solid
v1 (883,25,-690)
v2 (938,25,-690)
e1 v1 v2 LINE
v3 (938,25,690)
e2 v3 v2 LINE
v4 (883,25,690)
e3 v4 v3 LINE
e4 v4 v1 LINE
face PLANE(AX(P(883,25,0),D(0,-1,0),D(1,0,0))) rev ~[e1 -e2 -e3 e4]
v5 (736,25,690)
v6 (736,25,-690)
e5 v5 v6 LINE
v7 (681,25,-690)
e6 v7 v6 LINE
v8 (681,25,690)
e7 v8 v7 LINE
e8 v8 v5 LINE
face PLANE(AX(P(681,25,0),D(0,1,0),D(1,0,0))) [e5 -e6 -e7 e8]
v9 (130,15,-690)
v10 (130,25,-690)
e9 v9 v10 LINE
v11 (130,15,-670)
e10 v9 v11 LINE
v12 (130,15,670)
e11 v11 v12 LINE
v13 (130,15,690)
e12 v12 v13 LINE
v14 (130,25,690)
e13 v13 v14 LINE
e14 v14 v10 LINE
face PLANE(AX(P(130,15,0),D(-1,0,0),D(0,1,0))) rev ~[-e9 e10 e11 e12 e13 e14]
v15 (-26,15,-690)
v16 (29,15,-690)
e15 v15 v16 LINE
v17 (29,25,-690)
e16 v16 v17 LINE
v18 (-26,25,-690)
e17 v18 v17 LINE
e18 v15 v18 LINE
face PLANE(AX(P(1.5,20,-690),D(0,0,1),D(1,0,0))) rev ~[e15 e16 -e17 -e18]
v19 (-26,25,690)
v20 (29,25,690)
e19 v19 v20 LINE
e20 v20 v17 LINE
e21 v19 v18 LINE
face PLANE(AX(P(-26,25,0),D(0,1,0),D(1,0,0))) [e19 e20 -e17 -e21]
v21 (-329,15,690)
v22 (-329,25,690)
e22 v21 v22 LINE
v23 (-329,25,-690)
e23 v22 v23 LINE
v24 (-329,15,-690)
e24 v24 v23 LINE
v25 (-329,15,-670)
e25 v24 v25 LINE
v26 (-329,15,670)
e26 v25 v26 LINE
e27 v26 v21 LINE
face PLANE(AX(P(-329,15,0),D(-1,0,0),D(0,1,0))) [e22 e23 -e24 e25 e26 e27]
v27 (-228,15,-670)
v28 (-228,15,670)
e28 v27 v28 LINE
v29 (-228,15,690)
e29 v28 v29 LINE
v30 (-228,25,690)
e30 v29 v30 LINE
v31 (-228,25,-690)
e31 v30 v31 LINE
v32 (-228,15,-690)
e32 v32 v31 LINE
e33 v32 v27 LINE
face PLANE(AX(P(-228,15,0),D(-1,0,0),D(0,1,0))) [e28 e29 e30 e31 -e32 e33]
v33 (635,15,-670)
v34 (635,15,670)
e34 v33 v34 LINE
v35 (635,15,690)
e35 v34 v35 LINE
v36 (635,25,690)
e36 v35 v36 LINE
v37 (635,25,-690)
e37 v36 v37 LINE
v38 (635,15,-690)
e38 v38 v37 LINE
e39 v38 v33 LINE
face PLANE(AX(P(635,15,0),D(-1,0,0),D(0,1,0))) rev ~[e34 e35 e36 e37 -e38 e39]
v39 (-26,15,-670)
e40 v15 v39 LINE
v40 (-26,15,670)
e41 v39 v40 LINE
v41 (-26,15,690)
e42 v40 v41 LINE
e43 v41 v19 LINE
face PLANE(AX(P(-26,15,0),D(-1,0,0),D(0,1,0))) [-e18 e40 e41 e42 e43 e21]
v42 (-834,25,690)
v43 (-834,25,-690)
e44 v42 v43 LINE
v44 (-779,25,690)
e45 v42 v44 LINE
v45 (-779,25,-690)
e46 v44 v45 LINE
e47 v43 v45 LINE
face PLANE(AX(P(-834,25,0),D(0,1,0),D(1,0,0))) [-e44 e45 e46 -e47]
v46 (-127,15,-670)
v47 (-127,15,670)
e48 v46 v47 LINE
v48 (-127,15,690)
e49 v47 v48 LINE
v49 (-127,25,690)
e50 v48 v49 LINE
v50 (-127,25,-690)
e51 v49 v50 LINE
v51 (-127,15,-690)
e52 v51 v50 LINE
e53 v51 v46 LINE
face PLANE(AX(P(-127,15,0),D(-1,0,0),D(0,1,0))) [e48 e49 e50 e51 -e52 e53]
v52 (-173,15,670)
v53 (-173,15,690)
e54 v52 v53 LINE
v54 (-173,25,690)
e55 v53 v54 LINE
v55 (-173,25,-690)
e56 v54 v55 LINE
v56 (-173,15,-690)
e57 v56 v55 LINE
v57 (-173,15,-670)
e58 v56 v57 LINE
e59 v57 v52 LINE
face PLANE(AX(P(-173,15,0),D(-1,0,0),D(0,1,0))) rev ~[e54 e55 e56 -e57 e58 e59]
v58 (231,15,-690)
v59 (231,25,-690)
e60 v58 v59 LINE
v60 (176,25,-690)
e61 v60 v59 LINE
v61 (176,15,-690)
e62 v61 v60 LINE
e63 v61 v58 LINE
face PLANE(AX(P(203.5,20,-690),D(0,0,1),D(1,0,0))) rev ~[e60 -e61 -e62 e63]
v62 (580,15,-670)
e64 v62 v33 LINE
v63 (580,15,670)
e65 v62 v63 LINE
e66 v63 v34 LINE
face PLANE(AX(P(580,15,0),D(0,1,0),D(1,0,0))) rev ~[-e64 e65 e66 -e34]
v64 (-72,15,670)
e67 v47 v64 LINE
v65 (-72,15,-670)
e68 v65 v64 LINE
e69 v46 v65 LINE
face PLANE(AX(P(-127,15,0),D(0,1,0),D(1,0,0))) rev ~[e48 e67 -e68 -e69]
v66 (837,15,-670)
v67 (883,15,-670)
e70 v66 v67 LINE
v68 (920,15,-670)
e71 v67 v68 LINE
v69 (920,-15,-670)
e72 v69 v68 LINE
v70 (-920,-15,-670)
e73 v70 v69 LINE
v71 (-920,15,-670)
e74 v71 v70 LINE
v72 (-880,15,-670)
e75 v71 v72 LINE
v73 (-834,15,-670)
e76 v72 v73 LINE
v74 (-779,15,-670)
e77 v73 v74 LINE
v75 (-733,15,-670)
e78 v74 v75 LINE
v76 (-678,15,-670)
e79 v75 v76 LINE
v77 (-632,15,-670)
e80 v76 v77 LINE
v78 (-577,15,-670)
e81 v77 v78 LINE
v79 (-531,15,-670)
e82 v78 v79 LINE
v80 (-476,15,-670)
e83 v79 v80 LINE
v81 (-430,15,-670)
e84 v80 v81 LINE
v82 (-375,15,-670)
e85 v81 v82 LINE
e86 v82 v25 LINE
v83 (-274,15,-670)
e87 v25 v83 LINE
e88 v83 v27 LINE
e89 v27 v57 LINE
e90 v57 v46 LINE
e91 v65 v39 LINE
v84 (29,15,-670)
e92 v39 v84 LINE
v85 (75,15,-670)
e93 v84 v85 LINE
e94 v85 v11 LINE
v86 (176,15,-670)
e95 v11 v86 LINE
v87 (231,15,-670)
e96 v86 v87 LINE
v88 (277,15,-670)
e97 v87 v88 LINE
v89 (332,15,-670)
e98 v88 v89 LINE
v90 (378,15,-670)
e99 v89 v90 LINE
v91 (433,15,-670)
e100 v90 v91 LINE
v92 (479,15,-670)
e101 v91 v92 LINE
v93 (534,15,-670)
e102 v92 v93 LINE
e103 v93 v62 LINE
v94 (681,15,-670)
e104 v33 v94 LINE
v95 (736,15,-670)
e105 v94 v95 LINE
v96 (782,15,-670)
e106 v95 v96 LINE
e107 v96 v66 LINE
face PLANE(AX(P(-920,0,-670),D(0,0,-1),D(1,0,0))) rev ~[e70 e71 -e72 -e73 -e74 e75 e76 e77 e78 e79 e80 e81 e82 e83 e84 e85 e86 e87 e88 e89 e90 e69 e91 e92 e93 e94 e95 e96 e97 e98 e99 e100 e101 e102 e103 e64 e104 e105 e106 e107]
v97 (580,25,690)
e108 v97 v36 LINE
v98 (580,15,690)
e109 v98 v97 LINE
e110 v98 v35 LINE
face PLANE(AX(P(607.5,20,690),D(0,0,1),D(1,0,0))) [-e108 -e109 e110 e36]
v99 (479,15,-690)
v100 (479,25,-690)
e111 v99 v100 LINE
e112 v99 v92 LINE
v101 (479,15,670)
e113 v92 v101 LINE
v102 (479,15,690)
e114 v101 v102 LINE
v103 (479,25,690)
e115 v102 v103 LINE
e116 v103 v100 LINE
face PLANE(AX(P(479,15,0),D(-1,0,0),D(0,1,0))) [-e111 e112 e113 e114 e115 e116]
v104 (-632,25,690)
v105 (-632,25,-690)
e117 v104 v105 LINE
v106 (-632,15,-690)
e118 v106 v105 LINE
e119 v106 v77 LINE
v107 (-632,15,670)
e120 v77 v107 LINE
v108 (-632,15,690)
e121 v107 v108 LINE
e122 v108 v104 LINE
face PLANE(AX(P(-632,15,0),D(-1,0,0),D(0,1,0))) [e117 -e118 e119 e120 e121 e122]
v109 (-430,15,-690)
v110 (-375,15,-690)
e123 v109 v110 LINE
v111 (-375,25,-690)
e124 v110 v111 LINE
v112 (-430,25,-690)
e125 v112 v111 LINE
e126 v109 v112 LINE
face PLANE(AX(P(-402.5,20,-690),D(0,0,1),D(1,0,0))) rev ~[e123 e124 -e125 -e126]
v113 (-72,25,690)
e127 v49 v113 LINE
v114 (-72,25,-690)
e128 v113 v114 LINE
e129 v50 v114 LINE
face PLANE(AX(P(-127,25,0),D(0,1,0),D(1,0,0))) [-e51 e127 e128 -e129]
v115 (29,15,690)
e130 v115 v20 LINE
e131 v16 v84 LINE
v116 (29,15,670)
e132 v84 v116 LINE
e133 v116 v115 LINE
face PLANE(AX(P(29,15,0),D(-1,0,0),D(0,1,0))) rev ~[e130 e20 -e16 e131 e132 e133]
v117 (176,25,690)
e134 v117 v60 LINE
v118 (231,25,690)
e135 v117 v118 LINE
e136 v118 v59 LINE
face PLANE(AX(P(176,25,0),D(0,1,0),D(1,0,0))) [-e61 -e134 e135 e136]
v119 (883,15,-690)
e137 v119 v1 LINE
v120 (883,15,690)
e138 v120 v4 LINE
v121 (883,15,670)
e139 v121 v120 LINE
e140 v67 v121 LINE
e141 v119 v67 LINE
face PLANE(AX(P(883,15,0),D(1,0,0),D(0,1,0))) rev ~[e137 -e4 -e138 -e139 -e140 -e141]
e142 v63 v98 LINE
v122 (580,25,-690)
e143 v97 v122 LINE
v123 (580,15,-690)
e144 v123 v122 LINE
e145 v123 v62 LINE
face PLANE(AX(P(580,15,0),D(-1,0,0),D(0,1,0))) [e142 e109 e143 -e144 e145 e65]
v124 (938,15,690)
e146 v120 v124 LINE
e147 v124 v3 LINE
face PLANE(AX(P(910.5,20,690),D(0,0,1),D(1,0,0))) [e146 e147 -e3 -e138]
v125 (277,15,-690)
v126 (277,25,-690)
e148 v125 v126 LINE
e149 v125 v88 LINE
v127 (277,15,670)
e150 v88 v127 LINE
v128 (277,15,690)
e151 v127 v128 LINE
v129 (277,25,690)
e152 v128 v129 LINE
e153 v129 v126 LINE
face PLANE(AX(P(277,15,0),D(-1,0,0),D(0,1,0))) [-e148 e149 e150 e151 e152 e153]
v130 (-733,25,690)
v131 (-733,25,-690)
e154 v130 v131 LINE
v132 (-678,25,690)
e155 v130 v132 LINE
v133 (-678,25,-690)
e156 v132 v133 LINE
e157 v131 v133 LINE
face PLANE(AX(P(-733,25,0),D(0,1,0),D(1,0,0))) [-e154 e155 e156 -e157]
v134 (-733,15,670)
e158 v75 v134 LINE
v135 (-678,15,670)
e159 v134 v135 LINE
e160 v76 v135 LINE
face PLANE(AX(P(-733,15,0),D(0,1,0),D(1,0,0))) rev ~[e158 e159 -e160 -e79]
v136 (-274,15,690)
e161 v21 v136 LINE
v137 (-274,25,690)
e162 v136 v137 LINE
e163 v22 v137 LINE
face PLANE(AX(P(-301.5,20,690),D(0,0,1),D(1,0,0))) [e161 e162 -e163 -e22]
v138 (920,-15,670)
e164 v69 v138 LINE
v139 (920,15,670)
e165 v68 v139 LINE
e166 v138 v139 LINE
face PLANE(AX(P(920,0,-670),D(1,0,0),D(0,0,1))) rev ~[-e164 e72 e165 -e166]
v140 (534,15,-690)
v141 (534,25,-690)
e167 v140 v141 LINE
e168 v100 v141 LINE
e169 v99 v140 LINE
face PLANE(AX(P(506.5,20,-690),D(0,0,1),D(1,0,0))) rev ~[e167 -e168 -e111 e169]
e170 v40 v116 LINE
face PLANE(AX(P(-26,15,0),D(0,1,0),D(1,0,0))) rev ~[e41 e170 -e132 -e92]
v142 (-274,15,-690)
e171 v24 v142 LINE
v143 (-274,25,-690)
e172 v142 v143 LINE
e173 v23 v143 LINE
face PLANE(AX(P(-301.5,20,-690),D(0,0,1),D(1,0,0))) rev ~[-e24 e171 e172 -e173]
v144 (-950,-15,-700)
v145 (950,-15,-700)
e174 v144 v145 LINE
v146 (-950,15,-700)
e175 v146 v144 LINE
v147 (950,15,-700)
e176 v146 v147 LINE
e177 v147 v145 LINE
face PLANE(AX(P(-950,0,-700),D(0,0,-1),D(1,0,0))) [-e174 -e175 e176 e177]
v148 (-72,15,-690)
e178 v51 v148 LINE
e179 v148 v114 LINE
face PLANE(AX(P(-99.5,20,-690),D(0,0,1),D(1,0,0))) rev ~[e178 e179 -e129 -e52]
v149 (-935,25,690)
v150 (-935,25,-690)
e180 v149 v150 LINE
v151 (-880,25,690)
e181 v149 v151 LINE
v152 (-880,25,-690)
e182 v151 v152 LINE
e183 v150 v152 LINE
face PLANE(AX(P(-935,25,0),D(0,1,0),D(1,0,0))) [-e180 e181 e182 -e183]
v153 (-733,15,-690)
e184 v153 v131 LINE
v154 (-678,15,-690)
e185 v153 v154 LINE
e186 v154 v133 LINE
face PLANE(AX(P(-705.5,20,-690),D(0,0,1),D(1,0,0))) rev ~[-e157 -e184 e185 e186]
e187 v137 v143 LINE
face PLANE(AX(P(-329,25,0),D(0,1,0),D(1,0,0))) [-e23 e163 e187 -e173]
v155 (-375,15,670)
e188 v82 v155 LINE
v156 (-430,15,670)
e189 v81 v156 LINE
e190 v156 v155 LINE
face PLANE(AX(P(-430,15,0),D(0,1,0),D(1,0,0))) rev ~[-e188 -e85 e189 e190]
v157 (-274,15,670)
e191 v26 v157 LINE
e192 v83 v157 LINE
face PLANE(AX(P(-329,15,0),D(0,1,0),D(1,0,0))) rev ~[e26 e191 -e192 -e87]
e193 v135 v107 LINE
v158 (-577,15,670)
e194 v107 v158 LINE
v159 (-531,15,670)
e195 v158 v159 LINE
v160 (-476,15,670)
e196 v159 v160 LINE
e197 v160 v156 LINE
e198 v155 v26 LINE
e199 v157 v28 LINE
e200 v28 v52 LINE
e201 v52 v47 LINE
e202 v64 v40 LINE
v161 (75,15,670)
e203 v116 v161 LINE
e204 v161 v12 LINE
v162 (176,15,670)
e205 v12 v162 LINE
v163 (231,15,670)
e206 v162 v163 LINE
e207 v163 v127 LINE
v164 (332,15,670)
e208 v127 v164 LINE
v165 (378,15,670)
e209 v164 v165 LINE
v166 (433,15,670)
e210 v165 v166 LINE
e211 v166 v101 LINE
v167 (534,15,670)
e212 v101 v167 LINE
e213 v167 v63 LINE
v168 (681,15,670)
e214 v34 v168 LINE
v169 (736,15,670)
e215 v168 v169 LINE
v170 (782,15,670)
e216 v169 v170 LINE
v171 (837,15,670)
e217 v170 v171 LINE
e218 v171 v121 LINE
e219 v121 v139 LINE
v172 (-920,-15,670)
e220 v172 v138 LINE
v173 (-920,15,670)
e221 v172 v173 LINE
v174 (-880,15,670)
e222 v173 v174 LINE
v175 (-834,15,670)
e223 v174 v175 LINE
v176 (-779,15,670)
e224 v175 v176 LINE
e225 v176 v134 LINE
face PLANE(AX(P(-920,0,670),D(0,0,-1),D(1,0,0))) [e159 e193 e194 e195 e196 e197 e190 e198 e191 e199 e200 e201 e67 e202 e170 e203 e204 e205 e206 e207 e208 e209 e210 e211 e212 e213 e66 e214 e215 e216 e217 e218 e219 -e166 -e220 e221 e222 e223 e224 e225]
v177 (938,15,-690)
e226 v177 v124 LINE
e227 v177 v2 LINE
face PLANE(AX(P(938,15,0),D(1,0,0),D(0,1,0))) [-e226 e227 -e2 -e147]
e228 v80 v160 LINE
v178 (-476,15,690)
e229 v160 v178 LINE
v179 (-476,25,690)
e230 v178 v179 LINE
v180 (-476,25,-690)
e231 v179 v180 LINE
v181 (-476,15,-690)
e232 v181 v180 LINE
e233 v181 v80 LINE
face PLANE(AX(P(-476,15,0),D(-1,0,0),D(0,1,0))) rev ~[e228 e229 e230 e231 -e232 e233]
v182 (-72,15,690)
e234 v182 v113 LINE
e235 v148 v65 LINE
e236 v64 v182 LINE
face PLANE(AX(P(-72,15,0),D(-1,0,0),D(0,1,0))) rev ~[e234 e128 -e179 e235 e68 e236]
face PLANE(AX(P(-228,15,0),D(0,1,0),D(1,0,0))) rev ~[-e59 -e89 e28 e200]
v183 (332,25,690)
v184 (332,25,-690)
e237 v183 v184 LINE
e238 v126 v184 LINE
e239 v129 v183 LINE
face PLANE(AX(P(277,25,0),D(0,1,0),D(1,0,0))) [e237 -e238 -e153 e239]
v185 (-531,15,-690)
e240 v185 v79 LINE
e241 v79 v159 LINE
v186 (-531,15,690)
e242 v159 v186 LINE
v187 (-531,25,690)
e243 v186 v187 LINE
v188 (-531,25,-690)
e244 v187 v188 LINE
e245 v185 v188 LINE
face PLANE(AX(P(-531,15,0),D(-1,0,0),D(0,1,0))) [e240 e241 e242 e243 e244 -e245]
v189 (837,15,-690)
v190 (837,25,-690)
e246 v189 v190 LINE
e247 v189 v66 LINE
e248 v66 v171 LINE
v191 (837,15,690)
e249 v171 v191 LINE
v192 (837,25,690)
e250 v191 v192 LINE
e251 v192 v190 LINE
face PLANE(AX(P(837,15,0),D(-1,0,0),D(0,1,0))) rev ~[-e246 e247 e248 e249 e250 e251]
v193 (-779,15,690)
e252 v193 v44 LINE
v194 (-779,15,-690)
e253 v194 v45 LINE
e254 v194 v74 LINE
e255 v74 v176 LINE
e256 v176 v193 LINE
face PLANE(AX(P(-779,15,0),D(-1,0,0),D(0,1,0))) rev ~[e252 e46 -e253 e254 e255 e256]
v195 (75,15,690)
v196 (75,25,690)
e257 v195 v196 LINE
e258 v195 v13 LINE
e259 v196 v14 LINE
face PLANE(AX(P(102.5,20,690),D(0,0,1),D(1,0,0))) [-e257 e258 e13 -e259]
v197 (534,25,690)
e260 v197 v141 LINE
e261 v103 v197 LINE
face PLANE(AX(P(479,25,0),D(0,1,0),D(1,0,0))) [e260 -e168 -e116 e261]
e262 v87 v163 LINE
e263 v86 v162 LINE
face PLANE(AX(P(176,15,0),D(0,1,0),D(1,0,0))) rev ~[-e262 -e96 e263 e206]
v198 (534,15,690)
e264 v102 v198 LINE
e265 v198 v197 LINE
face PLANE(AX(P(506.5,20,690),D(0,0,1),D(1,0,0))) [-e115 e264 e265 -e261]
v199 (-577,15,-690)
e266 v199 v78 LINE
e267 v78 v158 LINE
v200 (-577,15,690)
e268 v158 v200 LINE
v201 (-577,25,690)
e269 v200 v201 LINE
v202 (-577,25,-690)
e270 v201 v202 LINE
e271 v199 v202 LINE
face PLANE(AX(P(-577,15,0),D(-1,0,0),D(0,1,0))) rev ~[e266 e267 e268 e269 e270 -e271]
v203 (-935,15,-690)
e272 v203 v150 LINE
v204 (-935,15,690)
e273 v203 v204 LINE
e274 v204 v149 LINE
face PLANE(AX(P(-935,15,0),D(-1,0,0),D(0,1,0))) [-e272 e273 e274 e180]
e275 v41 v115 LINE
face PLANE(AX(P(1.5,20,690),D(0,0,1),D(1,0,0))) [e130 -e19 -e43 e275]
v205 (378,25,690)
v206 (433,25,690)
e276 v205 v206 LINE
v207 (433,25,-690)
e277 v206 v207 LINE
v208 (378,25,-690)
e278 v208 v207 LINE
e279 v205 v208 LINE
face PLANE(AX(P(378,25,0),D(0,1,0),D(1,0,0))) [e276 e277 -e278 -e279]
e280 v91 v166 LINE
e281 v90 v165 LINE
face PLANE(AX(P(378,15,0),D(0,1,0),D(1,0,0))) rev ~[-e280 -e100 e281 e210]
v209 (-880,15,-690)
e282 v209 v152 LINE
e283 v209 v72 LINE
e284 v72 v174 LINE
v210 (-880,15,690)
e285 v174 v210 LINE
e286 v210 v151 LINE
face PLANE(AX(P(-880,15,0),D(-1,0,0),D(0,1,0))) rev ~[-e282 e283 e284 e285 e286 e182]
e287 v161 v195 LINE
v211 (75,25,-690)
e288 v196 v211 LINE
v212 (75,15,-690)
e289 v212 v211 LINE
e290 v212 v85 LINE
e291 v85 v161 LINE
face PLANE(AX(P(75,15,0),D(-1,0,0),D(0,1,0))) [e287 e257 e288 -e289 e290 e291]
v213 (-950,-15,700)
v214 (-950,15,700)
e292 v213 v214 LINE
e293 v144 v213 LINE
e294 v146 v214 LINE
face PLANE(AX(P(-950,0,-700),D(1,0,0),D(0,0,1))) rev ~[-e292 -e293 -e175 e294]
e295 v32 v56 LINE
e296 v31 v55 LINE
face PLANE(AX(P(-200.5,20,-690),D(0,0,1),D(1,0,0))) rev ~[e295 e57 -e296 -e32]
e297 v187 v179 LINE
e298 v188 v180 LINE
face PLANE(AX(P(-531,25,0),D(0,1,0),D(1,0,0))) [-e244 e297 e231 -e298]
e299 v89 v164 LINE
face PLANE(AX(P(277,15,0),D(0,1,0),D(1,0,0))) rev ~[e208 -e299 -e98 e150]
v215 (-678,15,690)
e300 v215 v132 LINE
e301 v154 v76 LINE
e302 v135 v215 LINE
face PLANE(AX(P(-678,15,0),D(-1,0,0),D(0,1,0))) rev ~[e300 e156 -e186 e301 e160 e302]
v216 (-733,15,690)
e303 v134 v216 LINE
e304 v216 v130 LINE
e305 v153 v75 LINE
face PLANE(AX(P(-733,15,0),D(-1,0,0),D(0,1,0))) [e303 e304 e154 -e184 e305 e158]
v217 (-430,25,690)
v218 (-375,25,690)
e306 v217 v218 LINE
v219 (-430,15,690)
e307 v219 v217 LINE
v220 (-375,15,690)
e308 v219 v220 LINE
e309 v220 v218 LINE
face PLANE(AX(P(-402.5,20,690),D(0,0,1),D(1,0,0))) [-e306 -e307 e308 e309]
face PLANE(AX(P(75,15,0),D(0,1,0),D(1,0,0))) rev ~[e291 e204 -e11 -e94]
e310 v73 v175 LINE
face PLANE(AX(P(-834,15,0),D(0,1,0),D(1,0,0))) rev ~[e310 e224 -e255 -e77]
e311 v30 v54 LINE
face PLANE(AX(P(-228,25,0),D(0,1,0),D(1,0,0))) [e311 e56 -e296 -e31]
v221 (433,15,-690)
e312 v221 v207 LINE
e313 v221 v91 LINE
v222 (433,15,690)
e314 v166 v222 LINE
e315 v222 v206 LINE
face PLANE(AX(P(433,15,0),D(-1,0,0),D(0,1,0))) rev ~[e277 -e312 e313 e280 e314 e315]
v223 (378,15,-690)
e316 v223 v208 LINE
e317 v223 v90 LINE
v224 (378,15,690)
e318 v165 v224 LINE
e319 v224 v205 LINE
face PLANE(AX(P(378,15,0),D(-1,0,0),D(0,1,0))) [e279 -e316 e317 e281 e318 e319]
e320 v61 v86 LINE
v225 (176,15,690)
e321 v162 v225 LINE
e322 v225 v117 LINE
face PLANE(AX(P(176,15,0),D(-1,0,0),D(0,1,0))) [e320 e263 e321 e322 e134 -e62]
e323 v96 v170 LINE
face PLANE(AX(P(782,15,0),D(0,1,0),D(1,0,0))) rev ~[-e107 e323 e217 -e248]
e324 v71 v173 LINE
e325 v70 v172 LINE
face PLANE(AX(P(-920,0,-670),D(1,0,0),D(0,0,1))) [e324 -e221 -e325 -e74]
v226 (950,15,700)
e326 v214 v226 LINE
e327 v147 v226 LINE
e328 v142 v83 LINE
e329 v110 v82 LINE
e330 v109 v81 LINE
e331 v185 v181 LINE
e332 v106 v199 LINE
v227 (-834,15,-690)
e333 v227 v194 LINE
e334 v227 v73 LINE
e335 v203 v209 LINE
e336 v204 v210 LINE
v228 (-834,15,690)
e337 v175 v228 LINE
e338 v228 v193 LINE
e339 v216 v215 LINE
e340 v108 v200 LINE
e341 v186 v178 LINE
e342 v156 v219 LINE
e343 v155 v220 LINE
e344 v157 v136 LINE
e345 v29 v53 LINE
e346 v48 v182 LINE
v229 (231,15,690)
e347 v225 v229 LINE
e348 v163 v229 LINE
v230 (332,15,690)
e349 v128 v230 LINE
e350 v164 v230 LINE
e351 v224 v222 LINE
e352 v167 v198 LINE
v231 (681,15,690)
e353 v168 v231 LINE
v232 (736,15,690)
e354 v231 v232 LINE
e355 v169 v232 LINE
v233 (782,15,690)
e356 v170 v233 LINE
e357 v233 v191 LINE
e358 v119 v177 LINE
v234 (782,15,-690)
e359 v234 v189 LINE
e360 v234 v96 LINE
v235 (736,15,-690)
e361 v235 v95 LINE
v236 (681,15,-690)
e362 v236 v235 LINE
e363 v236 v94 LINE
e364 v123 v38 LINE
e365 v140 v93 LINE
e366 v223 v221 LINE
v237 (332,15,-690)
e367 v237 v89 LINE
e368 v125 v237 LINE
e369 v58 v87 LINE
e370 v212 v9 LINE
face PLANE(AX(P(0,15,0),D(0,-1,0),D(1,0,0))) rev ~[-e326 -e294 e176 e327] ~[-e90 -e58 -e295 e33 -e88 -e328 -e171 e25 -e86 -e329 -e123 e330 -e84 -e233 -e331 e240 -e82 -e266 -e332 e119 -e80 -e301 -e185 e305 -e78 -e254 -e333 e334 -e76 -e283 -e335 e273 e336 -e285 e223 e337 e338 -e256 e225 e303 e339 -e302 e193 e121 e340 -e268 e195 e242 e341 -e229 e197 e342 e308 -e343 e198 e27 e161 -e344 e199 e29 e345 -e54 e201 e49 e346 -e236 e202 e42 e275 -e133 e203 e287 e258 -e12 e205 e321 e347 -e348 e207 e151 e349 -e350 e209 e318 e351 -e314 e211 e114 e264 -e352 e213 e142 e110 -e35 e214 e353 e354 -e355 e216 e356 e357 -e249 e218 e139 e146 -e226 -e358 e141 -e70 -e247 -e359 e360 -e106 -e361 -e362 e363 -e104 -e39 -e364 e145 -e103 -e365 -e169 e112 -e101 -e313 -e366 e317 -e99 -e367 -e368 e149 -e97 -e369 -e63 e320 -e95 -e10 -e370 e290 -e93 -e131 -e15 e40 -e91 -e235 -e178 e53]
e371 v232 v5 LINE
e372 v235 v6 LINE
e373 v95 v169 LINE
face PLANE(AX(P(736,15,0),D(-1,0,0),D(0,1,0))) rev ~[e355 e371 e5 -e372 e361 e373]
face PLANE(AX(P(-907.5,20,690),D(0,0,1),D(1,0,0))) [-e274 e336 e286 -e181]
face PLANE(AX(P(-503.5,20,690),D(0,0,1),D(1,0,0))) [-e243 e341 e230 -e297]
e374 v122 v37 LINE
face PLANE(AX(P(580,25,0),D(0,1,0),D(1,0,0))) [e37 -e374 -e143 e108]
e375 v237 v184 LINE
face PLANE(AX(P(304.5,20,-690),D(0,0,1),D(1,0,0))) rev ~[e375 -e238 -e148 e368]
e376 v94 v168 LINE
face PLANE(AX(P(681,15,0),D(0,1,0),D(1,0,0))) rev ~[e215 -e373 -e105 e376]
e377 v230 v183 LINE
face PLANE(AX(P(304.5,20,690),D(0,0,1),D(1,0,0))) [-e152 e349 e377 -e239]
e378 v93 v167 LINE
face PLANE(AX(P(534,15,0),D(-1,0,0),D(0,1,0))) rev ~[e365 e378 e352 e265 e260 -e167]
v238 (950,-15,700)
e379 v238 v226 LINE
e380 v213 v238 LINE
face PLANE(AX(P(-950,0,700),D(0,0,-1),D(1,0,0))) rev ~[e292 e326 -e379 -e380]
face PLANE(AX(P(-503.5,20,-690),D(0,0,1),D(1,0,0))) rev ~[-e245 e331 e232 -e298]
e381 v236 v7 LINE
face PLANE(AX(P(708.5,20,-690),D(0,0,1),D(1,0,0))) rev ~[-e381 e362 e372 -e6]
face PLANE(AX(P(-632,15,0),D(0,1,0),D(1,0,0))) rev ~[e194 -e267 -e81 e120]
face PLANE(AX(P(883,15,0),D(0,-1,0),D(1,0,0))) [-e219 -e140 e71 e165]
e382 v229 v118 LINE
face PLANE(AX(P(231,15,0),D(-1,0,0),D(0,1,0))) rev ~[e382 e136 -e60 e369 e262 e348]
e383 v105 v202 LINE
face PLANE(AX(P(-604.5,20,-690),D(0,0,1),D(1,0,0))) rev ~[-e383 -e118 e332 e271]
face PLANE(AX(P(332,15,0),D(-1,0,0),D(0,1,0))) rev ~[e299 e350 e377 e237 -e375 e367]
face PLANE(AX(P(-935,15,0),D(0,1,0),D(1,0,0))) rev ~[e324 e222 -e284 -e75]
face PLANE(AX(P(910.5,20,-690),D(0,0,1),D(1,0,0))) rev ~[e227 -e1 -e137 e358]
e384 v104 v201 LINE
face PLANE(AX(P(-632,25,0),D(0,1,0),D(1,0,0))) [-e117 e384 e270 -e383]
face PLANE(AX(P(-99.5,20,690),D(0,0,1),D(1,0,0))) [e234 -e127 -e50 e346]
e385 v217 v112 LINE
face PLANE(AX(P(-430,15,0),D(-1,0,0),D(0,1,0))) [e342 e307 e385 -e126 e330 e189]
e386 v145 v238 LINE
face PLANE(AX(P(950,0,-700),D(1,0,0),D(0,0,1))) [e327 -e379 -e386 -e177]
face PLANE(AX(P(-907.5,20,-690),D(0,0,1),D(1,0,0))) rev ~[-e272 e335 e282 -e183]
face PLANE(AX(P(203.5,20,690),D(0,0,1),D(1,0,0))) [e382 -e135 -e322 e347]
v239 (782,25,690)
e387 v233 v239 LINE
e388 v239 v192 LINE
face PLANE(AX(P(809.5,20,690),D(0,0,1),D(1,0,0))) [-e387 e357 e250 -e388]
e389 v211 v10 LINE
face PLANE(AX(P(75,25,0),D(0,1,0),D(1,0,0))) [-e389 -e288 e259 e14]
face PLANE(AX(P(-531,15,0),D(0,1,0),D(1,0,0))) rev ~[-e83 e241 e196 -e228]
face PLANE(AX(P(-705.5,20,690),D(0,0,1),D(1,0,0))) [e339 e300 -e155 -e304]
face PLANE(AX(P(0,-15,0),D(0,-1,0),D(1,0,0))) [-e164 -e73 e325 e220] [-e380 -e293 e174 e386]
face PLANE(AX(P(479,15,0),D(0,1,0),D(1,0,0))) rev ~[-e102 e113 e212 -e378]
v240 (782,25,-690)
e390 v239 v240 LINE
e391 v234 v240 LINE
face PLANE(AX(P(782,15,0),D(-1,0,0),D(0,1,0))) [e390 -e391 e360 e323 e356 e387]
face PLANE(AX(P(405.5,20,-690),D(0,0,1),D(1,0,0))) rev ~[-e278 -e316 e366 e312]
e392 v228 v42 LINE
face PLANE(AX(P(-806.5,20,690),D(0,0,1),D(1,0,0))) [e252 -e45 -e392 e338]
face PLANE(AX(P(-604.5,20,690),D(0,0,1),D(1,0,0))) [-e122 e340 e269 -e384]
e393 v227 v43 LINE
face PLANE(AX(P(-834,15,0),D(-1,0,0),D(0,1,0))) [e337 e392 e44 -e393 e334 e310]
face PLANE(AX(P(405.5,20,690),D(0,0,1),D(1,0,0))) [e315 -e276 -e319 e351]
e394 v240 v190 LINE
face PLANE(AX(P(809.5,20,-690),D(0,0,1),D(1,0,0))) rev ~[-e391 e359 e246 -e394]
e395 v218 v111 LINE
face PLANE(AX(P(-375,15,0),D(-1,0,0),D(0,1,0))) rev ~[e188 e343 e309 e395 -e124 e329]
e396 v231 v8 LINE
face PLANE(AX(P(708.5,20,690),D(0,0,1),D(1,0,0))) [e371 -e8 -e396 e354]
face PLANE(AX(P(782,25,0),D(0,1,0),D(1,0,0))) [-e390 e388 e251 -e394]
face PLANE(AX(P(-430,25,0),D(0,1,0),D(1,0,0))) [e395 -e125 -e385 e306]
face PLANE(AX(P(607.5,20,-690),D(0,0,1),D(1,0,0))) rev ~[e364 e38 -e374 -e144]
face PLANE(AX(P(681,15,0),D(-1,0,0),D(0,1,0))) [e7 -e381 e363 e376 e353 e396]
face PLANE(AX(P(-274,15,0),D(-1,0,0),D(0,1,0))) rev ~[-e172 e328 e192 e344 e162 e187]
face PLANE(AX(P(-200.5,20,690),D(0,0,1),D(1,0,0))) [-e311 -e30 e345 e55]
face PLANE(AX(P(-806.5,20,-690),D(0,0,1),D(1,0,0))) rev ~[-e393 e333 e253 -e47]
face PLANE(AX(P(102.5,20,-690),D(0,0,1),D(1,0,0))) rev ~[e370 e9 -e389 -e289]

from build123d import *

# Parameters (mm, degrees)
F0_W     = 1900
F0_H     = 1400
F0_W_2   = 1840
F0_H_2   = 1340
F1_DEPTH = 15
F2_W     = 55
F2_H     = 10
F3_DEPTH = 690


# Not quite as in the source:
# - a feature names something its author has since deleted; it is built from what else it names


with BuildPart() as f1:
    # F0 (on Front) → F1 (new body, symmetric)
    with BuildSketch(Plane.XZ):
        Rectangle(F0_W, F0_H)
        Rectangle(F0_W_2, F0_H_2, mode=Mode.SUBTRACT)
    extrude(amount=F1_DEPTH, both=True)

    # F2 (on Top) → F3 (join, symmetric)
    with BuildSketch(Plane.XY):
        with Locations((-907.5, 20)):
            Rectangle(F2_W, F2_H)
        with Locations((-806.5, 20)):
            Rectangle(F2_W, F2_H)
        with Locations((-705.5, 20)):
            Rectangle(F2_W, F2_H)
        with Locations((-604.5, 20)):
            Rectangle(F2_W, F2_H)
        with Locations((-503.5, 20)):
            Rectangle(F2_W, F2_H)
        with Locations((-402.5, 20)):
            Rectangle(F2_W, F2_H)
        with Locations((-301.5, 20)):
            Rectangle(F2_W, F2_H)
        with Locations((-200.5, 20)):
            Rectangle(F2_W, F2_H)
        with Locations((-99.5, 20)):
            Rectangle(F2_W, F2_H)
        with Locations((1.5, 20)):
            Rectangle(F2_W, F2_H)
        with Locations((102.5, 20)):
            Rectangle(F2_W, F2_H)
        with Locations((203.5, 20)):
            Rectangle(F2_W, F2_H)
        with Locations((304.5, 20)):
            Rectangle(F2_W, F2_H)
        with Locations((405.5, 20)):
            Rectangle(F2_W, F2_H)
        with Locations((506.5, 20)):
            Rectangle(F2_W, F2_H)
        with Locations((607.5, 20)):
            Rectangle(F2_W, F2_H)
        with Locations((708.5, 20)):
            Rectangle(F2_W, F2_H)
        with Locations((809.5, 20)):
            Rectangle(F2_W, F2_H)
        with Locations((910.5, 20)):
            Rectangle(F2_W, F2_H)
    extrude(amount=F3_DEPTH, both=True)


solid = f1.part
